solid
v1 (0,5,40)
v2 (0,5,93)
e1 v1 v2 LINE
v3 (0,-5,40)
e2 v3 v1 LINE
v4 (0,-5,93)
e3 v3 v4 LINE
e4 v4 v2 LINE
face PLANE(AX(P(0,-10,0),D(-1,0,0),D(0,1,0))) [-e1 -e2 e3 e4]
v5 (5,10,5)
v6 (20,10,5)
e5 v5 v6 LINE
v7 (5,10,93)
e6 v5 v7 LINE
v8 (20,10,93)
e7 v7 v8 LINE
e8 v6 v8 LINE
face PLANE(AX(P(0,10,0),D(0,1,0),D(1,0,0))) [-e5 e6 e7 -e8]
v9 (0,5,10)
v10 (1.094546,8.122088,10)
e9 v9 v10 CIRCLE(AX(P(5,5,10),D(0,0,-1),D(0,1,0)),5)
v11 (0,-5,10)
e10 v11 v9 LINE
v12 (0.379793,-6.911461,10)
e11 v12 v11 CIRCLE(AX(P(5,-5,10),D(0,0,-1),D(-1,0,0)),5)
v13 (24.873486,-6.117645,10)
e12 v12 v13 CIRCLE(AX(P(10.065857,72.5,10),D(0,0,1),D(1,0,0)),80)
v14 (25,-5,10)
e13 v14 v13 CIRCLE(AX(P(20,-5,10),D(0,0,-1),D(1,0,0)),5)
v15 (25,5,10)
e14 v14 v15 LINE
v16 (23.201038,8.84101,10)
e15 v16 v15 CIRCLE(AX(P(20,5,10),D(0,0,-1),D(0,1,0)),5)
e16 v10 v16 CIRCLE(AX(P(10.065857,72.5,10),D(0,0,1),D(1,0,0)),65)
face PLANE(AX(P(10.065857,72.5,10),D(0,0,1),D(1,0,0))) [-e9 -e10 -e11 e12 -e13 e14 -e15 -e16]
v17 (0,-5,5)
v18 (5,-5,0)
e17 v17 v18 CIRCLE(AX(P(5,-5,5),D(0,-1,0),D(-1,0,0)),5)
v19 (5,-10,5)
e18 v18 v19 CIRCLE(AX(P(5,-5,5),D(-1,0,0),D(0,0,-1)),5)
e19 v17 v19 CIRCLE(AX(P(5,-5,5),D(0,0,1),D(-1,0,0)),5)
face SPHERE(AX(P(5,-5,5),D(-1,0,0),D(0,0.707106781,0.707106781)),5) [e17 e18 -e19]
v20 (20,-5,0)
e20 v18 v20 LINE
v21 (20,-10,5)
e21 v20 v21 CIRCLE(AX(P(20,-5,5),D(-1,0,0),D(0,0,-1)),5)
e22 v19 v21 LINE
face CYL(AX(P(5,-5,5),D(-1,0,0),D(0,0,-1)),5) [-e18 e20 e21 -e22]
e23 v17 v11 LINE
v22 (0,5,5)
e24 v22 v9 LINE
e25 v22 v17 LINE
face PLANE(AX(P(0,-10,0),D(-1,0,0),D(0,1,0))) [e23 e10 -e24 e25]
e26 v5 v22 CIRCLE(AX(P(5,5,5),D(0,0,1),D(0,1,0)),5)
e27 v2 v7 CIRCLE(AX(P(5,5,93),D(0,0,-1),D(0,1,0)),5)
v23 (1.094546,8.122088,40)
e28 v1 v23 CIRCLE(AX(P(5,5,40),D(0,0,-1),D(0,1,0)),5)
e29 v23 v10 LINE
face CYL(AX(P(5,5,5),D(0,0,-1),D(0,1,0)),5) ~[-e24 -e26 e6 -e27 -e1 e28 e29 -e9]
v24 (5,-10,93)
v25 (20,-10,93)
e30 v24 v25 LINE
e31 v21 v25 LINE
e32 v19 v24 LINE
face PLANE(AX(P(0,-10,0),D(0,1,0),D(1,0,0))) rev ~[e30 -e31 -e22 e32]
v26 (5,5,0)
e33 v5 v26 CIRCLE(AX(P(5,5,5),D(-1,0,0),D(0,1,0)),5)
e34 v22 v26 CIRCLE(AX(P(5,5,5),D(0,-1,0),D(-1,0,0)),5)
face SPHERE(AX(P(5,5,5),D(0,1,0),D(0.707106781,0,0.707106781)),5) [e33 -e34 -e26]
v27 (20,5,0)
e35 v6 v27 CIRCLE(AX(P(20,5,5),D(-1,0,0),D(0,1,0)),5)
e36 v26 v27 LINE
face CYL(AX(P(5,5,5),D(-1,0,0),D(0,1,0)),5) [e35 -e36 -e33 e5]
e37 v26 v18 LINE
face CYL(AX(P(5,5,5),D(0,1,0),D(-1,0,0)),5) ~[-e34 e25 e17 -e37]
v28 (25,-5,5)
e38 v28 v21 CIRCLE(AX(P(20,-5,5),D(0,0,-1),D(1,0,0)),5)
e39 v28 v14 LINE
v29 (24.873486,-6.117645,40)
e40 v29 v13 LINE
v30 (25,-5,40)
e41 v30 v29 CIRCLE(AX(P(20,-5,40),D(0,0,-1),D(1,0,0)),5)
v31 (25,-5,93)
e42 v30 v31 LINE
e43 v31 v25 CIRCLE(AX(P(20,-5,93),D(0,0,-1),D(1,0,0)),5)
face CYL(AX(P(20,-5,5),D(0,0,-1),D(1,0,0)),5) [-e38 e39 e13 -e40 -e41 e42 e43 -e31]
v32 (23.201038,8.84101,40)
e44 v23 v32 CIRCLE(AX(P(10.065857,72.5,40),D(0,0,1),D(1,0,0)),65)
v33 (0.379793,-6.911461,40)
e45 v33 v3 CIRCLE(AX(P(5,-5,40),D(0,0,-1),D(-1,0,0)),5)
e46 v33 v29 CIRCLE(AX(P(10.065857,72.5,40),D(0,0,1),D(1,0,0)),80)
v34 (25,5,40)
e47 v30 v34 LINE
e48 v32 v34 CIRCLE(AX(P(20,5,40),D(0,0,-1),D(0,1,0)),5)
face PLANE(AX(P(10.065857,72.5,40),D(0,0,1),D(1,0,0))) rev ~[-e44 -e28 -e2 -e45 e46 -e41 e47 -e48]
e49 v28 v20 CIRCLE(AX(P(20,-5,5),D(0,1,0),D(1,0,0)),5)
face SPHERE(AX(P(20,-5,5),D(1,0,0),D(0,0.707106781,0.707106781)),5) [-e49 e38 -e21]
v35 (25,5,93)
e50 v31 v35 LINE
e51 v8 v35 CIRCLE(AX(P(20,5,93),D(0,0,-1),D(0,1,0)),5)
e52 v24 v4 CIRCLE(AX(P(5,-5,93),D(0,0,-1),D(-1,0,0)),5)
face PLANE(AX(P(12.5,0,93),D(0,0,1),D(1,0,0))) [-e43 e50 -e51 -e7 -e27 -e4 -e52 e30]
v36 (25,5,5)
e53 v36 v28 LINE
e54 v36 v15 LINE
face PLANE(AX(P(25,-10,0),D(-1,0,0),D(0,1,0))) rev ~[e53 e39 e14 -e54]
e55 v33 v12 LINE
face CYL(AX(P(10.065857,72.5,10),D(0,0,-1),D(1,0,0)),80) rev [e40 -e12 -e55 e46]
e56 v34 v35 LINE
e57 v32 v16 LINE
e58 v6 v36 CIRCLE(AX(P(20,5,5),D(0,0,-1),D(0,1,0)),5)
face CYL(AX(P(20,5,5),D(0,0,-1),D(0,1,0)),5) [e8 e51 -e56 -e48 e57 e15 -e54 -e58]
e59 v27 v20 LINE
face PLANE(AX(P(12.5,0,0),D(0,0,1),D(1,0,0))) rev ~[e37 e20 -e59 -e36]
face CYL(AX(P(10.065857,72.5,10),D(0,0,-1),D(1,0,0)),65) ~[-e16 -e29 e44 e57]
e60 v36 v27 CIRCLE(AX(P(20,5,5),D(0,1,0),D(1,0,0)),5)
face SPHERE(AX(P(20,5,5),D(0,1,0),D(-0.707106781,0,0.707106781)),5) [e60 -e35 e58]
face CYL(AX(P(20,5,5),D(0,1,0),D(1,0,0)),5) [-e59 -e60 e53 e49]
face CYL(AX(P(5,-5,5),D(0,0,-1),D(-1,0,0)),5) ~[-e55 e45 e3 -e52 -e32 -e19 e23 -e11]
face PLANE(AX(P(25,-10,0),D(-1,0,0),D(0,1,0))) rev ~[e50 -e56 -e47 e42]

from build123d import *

# Parameters (mm, degrees)
F0_W         = 25
F0_H         = 20
F1_DEPTH     = 93
F3_R         = 80
F3_R_2       = 65
F4_DEPTH     = 30
F6_T1_DEPTH  = 10
F6_T3_DEPTH  = 15
F6_T5_DEPTH  = 100.5
F6_S9_W      = 5
F6_S9_H      = 5
F6_T10_DEPTH = 5
F6_S15_W     = 5
F6_S15_H     = 5
F6_T16_DEPTH = 5
F6_S21_W     = 5
F6_S21_H     = 5
F6_T22_DEPTH = 5
F6_S27_W     = 5
F6_S27_H     = 5
F6_T28_DEPTH = 5


# Not quite as in the source:
# - a fillet or chamfer that OpenCascade refuses, or shapes differently, is made with other operations: its cross-section is extruded or revolved along the edge and cut away or added


with BuildPart() as f1:
    # F0 (on Top) → F1 (new body)
    with BuildSketch(Plane.XY):
        with Locations((12.5, 0)):
            Rectangle(F0_W, F0_H)
    extrude(amount=F1_DEPTH)


with BuildPart() as f4:
    # F3 (on offset) → F4 (new body)
    with BuildSketch(Plane.XY.offset(10)):
        with Locations((10.065856821, 72.5)):
            Circle(F3_R)
        with Locations((10.065856821, 72.5)):
            Circle(F3_R_2, mode=Mode.SUBTRACT)
    extrude(amount=F4_DEPTH)


with BuildPart() as f1_1:
    add(f1.part)

    # F5: cut F4
    add(f4.part, mode=Mode.SUBTRACT)

    # F6: fillet of radius 5 on 8 edges, made by hand

    # F6_s2 → F6_t1 (cut)
    with BuildSketch(Plane.XZ.offset(-5)):
        with BuildLine():
            ThreePointArc((0, 5), (1.4644660941, 1.4644660941), (5, 0))
            Line((5, 0), (0, 0))
            Line((0, 0), (0, 5))
        make_face()
        with BuildLine():
            ThreePointArc((25, 5), (23.5355339059, 1.4644660941), (20, 0))
            Line((20, 0), (25, 0))
            Line((25, 0), (25, 5))
        make_face()
    extrude(amount=F6_T1_DEPTH, mode=Mode.SUBTRACT)

    # F6_s4 → F6_t3 (cut)
    with BuildSketch(Plane.YZ.offset(5)):
        with BuildLine():
            ThreePointArc((10, 5), (8.5355339059, 1.4644660941), (5, 0))
            Line((5, 0), (10, 0))
            Line((10, 0), (10, 5))
        make_face()
        with BuildLine():
            ThreePointArc((-5, 0), (-8.5355339059, 1.4644660941), (-10, 5))
            Line((-10, 5), (-10, 0))
            Line((-10, 0), (-5, 0))
        make_face()
    extrude(amount=F6_T3_DEPTH, mode=Mode.SUBTRACT)

    # F6_s6 → F6_t5 (cut)
    with BuildSketch(Plane.XY.offset(5)):
        with BuildLine():
            ThreePointArc((25, -5), (23.5355339059, -8.5355339059), (20, -10))
            Line((20, -10), (25, -10))
            Line((25, -10), (25, -5))
        make_face()
        with BuildLine():
            ThreePointArc((0, -5), (1.4644660941, -8.5355339059), (5, -10))
            Line((5, -10), (0, -10))
            Line((0, -10), (0, -5))
        make_face()
        with BuildLine():
            ThreePointArc((5, 10), (1.4644660941, 8.5355339059), (0, 5))
            Line((0, 5), (0, 10))
            Line((0, 10), (5, 10))
        make_face()
        with BuildLine():
            ThreePointArc((20, 10), (23.5355339059, 8.5355339059), (25, 5))
            Line((25, 5), (25, 10))
            Line((25, 10), (20, 10))
        make_face()
    extrude(amount=F6_T5_DEPTH, mode=Mode.SUBTRACT)


with BuildPart() as f6_tool8:
    # F6_s9 → F6_t10 (new body)
    with BuildSketch(Plane.XZ.offset(-5)):
        with Locations((2.5, 2.5)):
            Rectangle(F6_S9_W, F6_S9_H)
    extrude(amount=-F6_T10_DEPTH)

    # F6_s11 → F6_t12 (revolve, cut)
    with BuildSketch(Plane(origin=(5, 5, 5), x_dir=(0.7071067812, 0, 0.7071067812), z_dir=(-0.7071067812, 0, 0.7071067812))):
        with BuildLine():
            ThreePointArc((0, -5), (5, 0), (0, 5))
            Line((0, 5), (0, -5))
        make_face()
    revolve(axis=Axis((5, 5, 5), (0, 1, 0)), mode=Mode.SUBTRACT)


with BuildPart() as f1_2:
    add(f1_1.part)

    # F6_t7: cut F6_tool8
    add(f6_tool8.part, mode=Mode.SUBTRACT)


with BuildPart() as f6_tool14:
    # F6_s15 → F6_t16 (new body)
    with BuildSketch(Plane.YZ.offset(5)):
        with Locations((-7.5, 2.5)):
            Rectangle(F6_S15_W, F6_S15_H)
    extrude(amount=-F6_T16_DEPTH)

    # F6_s17 → F6_t18 (revolve, cut)
    with BuildSketch(Plane(origin=(5, -5, 5), x_dir=(0, 0.7071067812, 0.7071067812), z_dir=(0, -0.7071067812, 0.7071067812))):
        with BuildLine():
            ThreePointArc((0, -5), (5, 0), (0, 5))
            Line((0, 5), (0, -5))
        make_face()
    revolve(axis=Axis((5, -5, 5), (-1, 0, 0)), mode=Mode.SUBTRACT)


with BuildPart() as f1_3:
    add(f1_2.part)

    # F6_t13: cut F6_tool14
    add(f6_tool14.part, mode=Mode.SUBTRACT)


with BuildPart() as f6_tool20:
    # F6_s21 → F6_t22 (new body)
    with BuildSketch(Plane.XZ.offset(-5)):
        with Locations((22.5, 2.5)):
            Rectangle(F6_S21_W, F6_S21_H)
    extrude(amount=-F6_T22_DEPTH)

    # F6_s23 → F6_t24 (revolve, cut)
    with BuildSketch(Plane(origin=(20, 5, 5), x_dir=(-0.7071067812, 0, 0.7071067812), z_dir=(-0.7071067812, 0, -0.7071067812))):
        with BuildLine():
            ThreePointArc((0, -5), (5, 0), (0, 5))
            Line((0, 5), (0, -5))
        make_face()
    revolve(axis=Axis((20, 5, 5), (0, 1, 0)), mode=Mode.SUBTRACT)


with BuildPart() as f1_4:
    add(f1_3.part)

    # F6_t19: cut F6_tool20
    add(f6_tool20.part, mode=Mode.SUBTRACT)


with BuildPart() as f6_tool26:
    # F6_s27 → F6_t28 (new body)
    with BuildSketch(Plane.YZ.offset(20)):
        with Locations((-7.5, 2.5)):
            Rectangle(F6_S27_W, F6_S27_H)
    extrude(amount=F6_T28_DEPTH)

    # F6_s29 → F6_t30 (revolve, cut)
    with BuildSketch(Plane(origin=(20, -5, 5), x_dir=(0, 0.7071067812, 0.7071067812), z_dir=(0, 0.7071067812, -0.7071067812))):
        with BuildLine():
            ThreePointArc((0, -5), (5, 0), (0, 5))
            Line((0, 5), (0, -5))
        make_face()
    revolve(axis=Axis((20, -5, 5), (1, 0, 0)), mode=Mode.SUBTRACT)


with BuildPart() as f1_5:
    add(f1_4.part)

    # F6_t25: cut F6_tool26
    add(f6_tool26.part, mode=Mode.SUBTRACT)


solid = f1_5.part
